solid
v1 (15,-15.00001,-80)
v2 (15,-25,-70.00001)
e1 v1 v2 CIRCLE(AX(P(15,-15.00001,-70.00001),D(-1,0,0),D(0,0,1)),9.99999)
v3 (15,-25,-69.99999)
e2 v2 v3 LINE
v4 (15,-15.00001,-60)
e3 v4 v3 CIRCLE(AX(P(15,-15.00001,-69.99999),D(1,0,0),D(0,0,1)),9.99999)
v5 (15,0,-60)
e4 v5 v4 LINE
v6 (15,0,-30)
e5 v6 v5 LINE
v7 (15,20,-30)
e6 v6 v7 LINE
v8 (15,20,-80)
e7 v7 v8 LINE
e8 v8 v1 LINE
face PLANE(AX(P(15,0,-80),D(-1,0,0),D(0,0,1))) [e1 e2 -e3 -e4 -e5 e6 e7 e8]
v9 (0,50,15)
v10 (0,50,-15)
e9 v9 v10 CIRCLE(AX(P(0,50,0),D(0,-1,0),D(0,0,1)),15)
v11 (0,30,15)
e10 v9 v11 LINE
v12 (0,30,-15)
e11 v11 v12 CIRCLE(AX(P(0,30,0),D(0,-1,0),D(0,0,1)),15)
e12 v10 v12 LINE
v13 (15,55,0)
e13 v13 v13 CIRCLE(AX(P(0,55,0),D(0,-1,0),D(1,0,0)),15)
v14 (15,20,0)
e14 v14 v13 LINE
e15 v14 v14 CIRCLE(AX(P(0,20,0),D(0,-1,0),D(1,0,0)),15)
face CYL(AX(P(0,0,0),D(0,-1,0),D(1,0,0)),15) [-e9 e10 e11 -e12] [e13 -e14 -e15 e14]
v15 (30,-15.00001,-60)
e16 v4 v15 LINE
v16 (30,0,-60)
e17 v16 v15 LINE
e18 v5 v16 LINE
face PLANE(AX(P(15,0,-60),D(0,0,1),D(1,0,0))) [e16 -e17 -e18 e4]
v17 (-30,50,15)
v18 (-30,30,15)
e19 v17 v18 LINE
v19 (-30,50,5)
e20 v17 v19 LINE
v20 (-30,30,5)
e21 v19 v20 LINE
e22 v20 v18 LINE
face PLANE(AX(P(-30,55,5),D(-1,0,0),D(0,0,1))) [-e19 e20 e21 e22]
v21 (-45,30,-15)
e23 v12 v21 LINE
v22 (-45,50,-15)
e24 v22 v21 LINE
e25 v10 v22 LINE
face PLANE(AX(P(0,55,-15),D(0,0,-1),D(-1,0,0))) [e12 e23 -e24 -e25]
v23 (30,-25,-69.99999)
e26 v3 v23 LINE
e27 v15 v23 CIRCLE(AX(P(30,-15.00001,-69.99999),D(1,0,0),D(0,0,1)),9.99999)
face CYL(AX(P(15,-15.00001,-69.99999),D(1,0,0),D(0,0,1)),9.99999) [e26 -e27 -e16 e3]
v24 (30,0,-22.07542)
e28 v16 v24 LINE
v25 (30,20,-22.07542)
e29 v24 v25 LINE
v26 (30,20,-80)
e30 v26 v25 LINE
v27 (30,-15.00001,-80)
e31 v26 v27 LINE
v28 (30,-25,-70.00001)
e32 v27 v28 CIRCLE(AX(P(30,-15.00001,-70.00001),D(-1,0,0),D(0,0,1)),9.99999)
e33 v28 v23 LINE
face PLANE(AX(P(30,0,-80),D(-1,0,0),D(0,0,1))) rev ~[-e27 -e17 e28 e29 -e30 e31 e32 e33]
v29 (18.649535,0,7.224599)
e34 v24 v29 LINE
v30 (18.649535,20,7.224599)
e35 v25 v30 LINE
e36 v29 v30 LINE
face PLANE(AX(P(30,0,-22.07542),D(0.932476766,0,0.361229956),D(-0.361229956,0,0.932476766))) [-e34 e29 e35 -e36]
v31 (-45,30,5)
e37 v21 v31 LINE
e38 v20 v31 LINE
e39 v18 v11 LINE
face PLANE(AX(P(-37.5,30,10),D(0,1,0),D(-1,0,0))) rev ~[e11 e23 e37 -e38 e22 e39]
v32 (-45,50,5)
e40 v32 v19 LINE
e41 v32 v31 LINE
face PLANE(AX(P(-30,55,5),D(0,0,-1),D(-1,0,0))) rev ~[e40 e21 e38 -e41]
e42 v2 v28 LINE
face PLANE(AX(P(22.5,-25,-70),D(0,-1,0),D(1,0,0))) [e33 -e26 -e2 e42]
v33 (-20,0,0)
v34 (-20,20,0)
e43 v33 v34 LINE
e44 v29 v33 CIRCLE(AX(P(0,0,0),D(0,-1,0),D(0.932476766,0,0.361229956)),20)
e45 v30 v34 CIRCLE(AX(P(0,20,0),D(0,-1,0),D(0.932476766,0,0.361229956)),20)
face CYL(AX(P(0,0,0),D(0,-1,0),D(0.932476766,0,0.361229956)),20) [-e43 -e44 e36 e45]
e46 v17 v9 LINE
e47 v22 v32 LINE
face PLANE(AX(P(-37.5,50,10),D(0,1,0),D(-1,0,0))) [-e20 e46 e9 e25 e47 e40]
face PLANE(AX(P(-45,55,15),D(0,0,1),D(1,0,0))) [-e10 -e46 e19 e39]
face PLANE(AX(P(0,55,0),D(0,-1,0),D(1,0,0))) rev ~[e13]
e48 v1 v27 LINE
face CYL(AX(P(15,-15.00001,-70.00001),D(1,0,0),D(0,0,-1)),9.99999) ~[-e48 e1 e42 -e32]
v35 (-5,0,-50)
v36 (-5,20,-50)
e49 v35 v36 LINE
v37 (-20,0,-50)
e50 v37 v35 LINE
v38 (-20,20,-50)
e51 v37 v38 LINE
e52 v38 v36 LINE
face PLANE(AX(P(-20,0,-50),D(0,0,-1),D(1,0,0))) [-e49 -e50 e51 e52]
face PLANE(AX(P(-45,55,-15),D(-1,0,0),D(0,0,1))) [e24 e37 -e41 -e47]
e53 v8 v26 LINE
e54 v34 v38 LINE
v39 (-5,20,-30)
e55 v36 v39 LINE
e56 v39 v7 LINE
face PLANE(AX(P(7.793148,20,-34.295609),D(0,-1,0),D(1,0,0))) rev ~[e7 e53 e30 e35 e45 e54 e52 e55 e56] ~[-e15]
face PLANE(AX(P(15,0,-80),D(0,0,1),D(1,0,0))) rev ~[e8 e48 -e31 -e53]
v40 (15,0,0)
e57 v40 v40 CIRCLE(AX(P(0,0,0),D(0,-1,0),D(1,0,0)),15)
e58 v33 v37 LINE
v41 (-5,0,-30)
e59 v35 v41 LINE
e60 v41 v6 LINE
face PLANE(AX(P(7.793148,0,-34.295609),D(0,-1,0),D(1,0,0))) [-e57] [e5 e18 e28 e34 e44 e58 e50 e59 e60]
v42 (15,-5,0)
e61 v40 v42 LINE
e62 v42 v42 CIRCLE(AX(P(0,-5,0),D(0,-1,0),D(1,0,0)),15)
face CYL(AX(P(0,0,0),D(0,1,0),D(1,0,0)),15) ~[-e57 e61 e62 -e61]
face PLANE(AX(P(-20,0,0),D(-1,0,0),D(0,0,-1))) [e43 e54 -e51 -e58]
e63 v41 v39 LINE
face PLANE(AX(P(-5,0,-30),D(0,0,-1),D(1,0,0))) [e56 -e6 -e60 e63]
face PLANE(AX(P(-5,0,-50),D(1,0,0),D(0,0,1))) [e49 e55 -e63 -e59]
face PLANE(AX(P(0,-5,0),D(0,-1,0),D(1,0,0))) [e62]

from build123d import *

# Parameters (mm, degrees)
F1_DEPTH      = 20
F2_R          = 15
F3_DEPTH      = 5
F3_DEPTH_BACK = 55
F4_W          = 15
F4_H          = 20
F5_DEPTH      = 25
F6_R          = 9.99999
F7_W          = 15
F7_H          = 10
F8_DEPTH      = 25
F9_DEPTH      = 25
F10_DEPTH     = 5


# Not quite as in the source:
# - a fillet or chamfer is up to 0.001 mm smaller than in the source, because OpenCascade refuses the exact size


with BuildPart() as f1:
    # F0 (on Front) → F1 (new body)
    with BuildSketch(Plane.XZ):
        with BuildLine():
            ThreePointArc((18.649535318, 7.2245991185), (19.659485069, 3.6748669119), (20, 0))
            ThreePointArc((20, 0), (0, -20), (-20, 0))
            Line((-20, 0), (-20, -50))
            Line((-20, -50), (-5, -50))
            Line((-5, -50), (-5, -30))
            Line((-5, -30), (15, -30))
            Line((15, -30), (15, -80))
            Line((15, -80), (30, -80))
            Line((30, -80), (30, -22.0754199539))
            Line((30, -22.0754199539), (18.649535318, 7.2245991185))
        make_face()
        with BuildLine():
            ThreePointArc((-20, 0), (0, -20), (20, 0))
            ThreePointArc((20, 0), (19.659485069, 3.6748669119), (18.649535318, 7.2245991185))
            ThreePointArc((18.649535318, 7.2245991185), (-3.6748669119, 19.659485069), (-20, 0))
        make_face()
    extrude(amount=-F1_DEPTH)

    # F2 (on face) → F3 (join, two sides)
    with BuildSketch(Plane.XZ) as f3_sk:
        Circle(F2_R)
    extrude(amount=F3_DEPTH)
    extrude(f3_sk.sketch, amount=-F3_DEPTH_BACK)

    # F4 (on face) → F5 (join)
    with BuildSketch(Plane.XZ):
        with Locations((22.5, -70)):
            Rectangle(F4_W, F4_H)
    extrude(amount=F5_DEPTH)

    # F6 (radius 10 in the source; OpenCascade refuses exactly that, so slightly less here)
    f6_edges = [f1.edges().sort_by_distance(p)[0] for p in [
        (22.5, -25, -60),
        (22.5, -25, -80),
    ]]
    fillet(f6_edges, radius=F6_R)

    # F7 (on face) → F8 (join)
    with BuildSketch(Plane(origin=(0, 55, 0), x_dir=(-1, 0, 0), z_dir=(0, 1, 0))):
        with Locations((37.5, 10)):
            Rectangle(F7_W, F7_H)
        with BuildLine():
            Line((30, 15), (0, 15))
            ThreePointArc((0, 15), (10.6066017178, 10.6066017178), (15, 0))
            ThreePointArc((15, 0), (10.6066017178, -10.6066017178), (0, -15))
            Line((0, -15), (45, -15))
            Line((45, -15), (45, 5))
            Line((45, 5), (30, 5))
            Line((30, 5), (30, 15))
        make_face()
    extrude(amount=-F8_DEPTH)

    # F7 (on face) → F9 (cut)
    with BuildSketch(Plane(origin=(0, 55, 0), x_dir=(-1, 0, 0), z_dir=(0, 1, 0))):
        with Locations((37.5, 10)):
            Rectangle(F7_W, F7_H)
    extrude(amount=-F9_DEPTH, mode=Mode.SUBTRACT)

    # F7 (on face) → F10 (cut)
    with BuildSketch(Plane(origin=(0, 55, 0), x_dir=(-1, 0, 0), z_dir=(0, 1, 0))):
        with Locations((37.5, 10)):
            Rectangle(F7_W, F7_H)
        with BuildLine():
            Line((30, 15), (0, 15))
            ThreePointArc((0, 15), (10.6066017178, 10.6066017178), (15, 0))
            ThreePointArc((15, 0), (10.6066017178, -10.6066017178), (0, -15))
            Line((0, -15), (45, -15))
            Line((45, -15), (45, 5))
            Line((45, 5), (30, 5))
            Line((30, 5), (30, 15))
        make_face()
    extrude(amount=-F10_DEPTH, mode=Mode.SUBTRACT)


solid = f1.part
